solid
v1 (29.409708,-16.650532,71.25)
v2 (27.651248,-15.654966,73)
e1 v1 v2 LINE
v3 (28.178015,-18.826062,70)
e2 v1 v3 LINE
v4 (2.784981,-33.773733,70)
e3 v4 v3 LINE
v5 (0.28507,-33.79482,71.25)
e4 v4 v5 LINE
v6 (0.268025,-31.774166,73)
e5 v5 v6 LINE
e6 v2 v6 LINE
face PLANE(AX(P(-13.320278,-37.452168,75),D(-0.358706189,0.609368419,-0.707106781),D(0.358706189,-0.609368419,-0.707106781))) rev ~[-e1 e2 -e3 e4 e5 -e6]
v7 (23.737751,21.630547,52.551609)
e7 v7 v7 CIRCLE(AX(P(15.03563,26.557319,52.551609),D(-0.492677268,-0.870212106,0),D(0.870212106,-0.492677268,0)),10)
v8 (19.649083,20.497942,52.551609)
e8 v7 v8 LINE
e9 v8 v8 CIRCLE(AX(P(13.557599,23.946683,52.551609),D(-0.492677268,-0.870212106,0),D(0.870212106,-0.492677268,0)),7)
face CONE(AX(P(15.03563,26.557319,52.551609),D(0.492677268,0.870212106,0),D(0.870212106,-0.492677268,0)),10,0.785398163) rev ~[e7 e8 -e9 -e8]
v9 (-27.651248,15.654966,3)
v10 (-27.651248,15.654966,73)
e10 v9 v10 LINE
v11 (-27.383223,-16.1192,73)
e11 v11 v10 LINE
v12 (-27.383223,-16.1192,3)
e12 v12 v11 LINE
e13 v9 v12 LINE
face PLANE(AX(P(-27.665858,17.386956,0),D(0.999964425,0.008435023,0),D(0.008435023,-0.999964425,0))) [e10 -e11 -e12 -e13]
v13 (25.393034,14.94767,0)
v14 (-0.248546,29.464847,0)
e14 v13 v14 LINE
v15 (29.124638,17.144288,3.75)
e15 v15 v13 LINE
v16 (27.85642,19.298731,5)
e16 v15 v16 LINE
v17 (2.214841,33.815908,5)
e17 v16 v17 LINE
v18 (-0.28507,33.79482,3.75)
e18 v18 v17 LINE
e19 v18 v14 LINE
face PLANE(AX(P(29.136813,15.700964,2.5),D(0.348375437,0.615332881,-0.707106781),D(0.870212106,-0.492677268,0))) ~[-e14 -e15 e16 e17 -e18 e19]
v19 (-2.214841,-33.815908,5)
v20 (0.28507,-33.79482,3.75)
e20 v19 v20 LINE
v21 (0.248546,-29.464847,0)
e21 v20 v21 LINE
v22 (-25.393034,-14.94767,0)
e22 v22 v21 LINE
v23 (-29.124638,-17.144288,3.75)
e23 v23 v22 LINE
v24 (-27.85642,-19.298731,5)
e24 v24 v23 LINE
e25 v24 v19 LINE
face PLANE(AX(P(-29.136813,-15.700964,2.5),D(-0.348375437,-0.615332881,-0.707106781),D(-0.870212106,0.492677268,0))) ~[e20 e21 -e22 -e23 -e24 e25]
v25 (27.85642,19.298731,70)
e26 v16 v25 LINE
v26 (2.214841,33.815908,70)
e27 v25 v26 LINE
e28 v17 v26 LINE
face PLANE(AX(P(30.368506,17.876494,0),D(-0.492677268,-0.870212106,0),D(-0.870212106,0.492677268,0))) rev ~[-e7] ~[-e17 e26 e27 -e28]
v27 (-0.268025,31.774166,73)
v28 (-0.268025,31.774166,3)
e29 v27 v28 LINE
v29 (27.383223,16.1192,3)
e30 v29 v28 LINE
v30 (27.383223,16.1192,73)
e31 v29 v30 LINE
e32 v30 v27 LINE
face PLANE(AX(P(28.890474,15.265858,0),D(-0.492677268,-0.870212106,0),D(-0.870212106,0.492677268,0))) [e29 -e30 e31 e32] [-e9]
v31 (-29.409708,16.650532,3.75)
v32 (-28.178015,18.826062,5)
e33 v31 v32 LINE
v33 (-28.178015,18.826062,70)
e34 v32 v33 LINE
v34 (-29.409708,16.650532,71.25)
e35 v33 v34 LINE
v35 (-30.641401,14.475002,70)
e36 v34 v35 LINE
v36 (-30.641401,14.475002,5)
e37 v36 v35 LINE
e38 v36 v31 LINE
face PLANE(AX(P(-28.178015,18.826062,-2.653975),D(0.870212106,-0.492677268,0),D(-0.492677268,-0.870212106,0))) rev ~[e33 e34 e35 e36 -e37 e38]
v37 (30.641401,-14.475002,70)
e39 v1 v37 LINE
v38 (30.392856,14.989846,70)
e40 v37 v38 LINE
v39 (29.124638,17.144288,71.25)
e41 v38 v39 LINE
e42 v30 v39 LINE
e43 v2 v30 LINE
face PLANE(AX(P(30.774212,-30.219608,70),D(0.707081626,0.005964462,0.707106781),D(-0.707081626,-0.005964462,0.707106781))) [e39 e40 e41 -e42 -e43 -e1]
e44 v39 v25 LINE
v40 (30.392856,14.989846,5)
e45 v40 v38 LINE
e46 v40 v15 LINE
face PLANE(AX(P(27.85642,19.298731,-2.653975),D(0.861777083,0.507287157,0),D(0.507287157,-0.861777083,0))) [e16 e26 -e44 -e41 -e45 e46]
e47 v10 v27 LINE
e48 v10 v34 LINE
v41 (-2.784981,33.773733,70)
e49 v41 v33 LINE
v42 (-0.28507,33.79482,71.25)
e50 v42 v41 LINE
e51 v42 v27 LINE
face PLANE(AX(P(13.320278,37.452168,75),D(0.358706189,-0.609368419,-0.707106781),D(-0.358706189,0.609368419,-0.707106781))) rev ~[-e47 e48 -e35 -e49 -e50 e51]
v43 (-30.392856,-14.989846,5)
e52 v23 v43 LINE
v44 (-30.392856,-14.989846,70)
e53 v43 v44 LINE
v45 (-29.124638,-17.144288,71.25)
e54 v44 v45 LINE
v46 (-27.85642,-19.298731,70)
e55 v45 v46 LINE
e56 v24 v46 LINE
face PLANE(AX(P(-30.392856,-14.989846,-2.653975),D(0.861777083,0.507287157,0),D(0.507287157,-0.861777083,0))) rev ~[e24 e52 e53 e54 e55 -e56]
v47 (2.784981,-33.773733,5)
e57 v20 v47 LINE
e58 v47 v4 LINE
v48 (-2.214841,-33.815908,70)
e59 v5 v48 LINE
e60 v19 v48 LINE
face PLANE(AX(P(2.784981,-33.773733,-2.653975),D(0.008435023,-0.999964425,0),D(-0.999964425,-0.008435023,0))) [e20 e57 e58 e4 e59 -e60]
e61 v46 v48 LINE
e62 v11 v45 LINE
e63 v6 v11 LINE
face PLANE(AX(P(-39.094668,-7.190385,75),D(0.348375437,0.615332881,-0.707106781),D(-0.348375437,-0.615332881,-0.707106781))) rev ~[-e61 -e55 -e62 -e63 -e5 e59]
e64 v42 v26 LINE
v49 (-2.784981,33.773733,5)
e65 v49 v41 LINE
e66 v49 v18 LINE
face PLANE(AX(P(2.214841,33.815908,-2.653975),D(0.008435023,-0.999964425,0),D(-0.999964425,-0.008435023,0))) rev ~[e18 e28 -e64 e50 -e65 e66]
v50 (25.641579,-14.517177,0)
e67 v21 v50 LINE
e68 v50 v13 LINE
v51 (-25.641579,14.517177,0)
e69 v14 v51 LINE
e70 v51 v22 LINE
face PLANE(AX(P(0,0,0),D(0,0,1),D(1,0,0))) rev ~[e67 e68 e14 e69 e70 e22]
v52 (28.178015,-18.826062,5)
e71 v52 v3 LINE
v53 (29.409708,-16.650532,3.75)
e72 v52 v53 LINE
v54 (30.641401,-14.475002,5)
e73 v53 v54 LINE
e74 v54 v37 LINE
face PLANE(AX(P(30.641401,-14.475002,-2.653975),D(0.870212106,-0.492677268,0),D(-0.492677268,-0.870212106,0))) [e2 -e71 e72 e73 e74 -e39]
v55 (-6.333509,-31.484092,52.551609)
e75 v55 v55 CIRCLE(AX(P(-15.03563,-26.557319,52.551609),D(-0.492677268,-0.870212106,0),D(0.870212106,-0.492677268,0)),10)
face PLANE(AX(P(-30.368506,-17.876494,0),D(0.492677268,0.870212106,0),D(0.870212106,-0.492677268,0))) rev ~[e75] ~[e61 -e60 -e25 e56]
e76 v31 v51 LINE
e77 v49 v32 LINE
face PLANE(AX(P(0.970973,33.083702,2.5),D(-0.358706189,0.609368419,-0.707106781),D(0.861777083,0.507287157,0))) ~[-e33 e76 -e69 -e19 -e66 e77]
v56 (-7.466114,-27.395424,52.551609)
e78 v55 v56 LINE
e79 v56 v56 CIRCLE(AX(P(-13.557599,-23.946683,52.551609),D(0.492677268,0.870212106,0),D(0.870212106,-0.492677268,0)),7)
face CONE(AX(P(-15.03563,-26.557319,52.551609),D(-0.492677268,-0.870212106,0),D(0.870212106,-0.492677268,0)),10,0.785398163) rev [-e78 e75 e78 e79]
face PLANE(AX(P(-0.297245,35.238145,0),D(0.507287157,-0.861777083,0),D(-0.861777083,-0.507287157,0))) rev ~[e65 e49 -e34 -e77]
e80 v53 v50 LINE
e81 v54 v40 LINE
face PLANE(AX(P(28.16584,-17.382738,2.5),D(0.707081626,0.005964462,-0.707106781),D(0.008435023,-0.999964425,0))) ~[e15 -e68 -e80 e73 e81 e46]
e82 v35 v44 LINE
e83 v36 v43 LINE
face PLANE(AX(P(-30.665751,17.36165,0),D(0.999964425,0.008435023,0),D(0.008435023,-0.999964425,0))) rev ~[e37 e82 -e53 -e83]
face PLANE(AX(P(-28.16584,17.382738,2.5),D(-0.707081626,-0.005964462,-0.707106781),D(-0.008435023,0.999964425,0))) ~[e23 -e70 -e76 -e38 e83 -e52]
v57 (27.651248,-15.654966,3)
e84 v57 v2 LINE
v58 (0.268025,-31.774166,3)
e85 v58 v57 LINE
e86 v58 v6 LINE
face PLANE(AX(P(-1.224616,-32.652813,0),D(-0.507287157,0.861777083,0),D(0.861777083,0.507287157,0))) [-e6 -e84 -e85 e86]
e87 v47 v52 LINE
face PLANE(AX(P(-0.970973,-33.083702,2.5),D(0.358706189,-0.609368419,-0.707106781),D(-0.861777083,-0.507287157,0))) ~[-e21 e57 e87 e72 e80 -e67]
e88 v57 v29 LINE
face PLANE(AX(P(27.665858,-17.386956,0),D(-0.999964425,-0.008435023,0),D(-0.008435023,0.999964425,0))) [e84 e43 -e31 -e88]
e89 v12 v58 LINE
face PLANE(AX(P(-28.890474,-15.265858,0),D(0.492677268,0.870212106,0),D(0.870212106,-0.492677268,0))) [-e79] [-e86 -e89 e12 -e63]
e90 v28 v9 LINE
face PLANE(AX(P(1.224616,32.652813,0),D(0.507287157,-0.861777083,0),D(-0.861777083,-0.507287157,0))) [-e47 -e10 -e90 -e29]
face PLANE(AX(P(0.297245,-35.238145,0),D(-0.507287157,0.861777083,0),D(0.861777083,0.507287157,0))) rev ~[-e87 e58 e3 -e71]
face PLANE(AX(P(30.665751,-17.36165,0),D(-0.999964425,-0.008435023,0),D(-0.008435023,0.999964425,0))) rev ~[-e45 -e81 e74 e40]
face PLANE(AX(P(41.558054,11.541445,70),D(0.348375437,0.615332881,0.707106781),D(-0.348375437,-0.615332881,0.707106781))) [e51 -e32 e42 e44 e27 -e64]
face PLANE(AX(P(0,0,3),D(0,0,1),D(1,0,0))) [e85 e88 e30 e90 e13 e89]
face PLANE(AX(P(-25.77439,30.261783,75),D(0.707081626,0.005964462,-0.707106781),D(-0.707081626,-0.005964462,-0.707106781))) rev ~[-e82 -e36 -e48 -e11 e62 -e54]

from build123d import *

# Parameters (mm, degrees)
F1_DEPTH     = 75
F2_T         = -3
F3_SIZE      = 5
F4_T1_DEPTH  = 60.9562282093
F4_T3_DEPTH  = 60.9562282093
F4_T5_DEPTH  = 60.9562282093
F4_T7_DEPTH  = 60.9562282093
F4_T9_DEPTH  = 60.9562282093
F4_T11_DEPTH = 60.9562282093
F6_D         = 10
F7_T1_DEPTH  = 80.3079500043


# Not quite as in the source:
# - a fillet or chamfer that OpenCascade refuses, or shapes differently, is made with other operations: its cross-section is extruded or revolved along the edge and cut away or added


with BuildPart() as f1:
    # F0 (on Top) → F1 (new body)
    with BuildSketch(Plane.XY):
        Polygon((-0.2972451442, 35.2381446725), (-30.6657510407, 17.3616504902), (-30.3685058965, -17.8764941822), (0.2972451442, -35.2381446725), (30.6657510407, -17.3616504902), (30.3685058965, 17.8764941822), align=None)
    extrude(amount=F1_DEPTH)

    # F2
    f2_openings = [f1.faces().sort_by_distance(p)[0] for p in [
        (0, 0, 75),
    ]]
    offset(amount=F2_T, openings=f2_openings)

    # F3
    f3_edges = [f1.edges().sort_by_distance(p)[0] for p in [
        (15.03563, 26.557319, 0),
        (-15.481498, 26.299898, 0),
        (-30.517128, -0.257422, 0),
        (-15.03563, -26.557319, 0),
        (15.481498, -26.299898, 0),
        (30.517128, 0.257422, 0),
    ]]
    chamfer(f3_edges, length=F3_SIZE)

    # F4: chamfer of 5 on 6 edges, made by hand

    # F4_s2 → F4_t1 (cut)
    with BuildSketch(Plane(origin=(-26.5224238672, 15.0158739867, 0), x_dir=(0, 0, 1), z_dir=(0.8702121062, -0.4926772679, 0))):
        Polygon((75, 25.5182141675), (70, 30.5182141675), (75, 30.5182141675), align=None)
    extrude(amount=F4_T1_DEPTH, mode=Mode.SUBTRACT)

    # F4_s4 → F4_t3 (cut)
    with BuildSketch(Plane(origin=(-0.257083601, 30.4770298323, 0), x_dir=(0, 0, 1), z_dir=(0.0084350232, -0.9999644246, 0))):
        Polygon((75, 25.5182141675), (70, 30.5182141675), (75, 30.5182141675), align=None)
    extrude(amount=F4_T3_DEPTH, mode=Mode.SUBTRACT)

    # F4_s6 → F4_t5 (cut)
    with BuildSketch(Plane(origin=(26.2653402661, 15.4611558455, 0), x_dir=(0, 0, 1), z_dir=(-0.8617770829, -0.5072871567, 0))):
        Polygon((75, 25.5182141675), (70, 30.5182141675), (75, 30.5182141675), align=None)
    extrude(amount=F4_T5_DEPTH, mode=Mode.SUBTRACT)

    # F4_s8 → F4_t7 (cut)
    with BuildSketch(Plane(origin=(26.5224238672, -15.0158739867, 0), x_dir=(0, 0, 1), z_dir=(-0.8702121062, 0.4926772679, 0))):
        Polygon((70, 30.5182141675), (75, 25.5182141675), (75, 30.5182141675), align=None)
    extrude(amount=F4_T7_DEPTH, mode=Mode.SUBTRACT)

    # F4_s10 → F4_t9 (cut)
    with BuildSketch(Plane(origin=(0.257083601, -30.4770298323, 0), x_dir=(0, 0, 1), z_dir=(-0.0084350232, 0.9999644246, 0))):
        Polygon((70, 30.5182141675), (75, 25.5182141675), (75, 30.5182141675), align=None)
    extrude(amount=F4_T9_DEPTH, mode=Mode.SUBTRACT)

    # F4_s12 → F4_t11 (cut)
    with BuildSketch(Plane(origin=(-26.2653402661, -15.4611558455, 0), x_dir=(0, 0, 1), z_dir=(0.8617770829, 0.5072871567, 0))):
        Polygon((75, 25.5182141675), (70, 30.5182141675), (75, 30.5182141675), align=None)
    extrude(amount=F4_T11_DEPTH, mode=Mode.SUBTRACT)

    # F6 (through all)
    with Locations(Plane(origin=(-15.0356303762, -26.5573194273, 0), x_dir=(0.8702121062, -0.4926772679, 0), z_dir=(-0.4926772679, -0.8702121062, 0))):
        with Locations((0, 52.5516085327)):
            Hole(F6_D / 2)

    # F7: chamfer of 5 on 8 edges, made by hand

    # F7_s2 → F7_t1 (cut)
    with BuildSketch(Plane.XY.offset(-2.6539750021)):
        Polygon((-30.3928557112, -14.9898455337), (-27.8564199277, -19.2987309484), (-30.3685058965, -17.8764941822), align=None)
        Polygon((-28.1780148866, 18.8260623726), (-30.6414012259, 14.4750018417), (-30.6657510407, 17.3616504902), align=None)
        Polygon((2.2148408246, 33.8159079063), (-2.7849812982, 33.7737327901), (-0.2972451442, 35.2381446725), align=None)
        Polygon((27.8564199277, 19.2987309484), (30.3928557112, 14.9898455337), (30.3685058965, 17.8764941822), align=None)
        Polygon((30.6414012259, -14.4750018417), (28.1780148866, -18.8260623726), (30.6657510407, -17.3616504902), align=None)
        Polygon((2.7849812982, -33.7737327901), (-2.2148408246, -33.8159079063), (0.2972451442, -35.2381446725), align=None)
    extrude(amount=F7_T1_DEPTH, mode=Mode.SUBTRACT)

    # F7_s3 → F7_t4 (revolve, cut)
    with BuildSketch(Plane.XY.offset(52.5516085327)):
        Polygon((23.7377514379, 21.6305467487), (16.9233045677, 19.7428725572), (19.386690907, 24.093933088), align=None)
    revolve(axis=Axis((15.0356303762, 26.5573194273, 52.5516085327), (-0.4926772679, -0.8702121062, 0)), mode=Mode.SUBTRACT)

    # F7_s5 → F7_t6 (revolve, cut)
    with BuildSketch(Plane.XY.offset(52.5516085327)):
        Polygon((-6.3335093144, -31.484092106), (-8.221183506, -24.6696452358), (-10.6845698453, -29.0207057667), align=None)
    revolve(axis=Axis((-15.0356303762, -26.5573194273, 52.5516085327), (-0.4926772679, -0.8702121062, 0)), mode=Mode.SUBTRACT)


solid = f1.part
